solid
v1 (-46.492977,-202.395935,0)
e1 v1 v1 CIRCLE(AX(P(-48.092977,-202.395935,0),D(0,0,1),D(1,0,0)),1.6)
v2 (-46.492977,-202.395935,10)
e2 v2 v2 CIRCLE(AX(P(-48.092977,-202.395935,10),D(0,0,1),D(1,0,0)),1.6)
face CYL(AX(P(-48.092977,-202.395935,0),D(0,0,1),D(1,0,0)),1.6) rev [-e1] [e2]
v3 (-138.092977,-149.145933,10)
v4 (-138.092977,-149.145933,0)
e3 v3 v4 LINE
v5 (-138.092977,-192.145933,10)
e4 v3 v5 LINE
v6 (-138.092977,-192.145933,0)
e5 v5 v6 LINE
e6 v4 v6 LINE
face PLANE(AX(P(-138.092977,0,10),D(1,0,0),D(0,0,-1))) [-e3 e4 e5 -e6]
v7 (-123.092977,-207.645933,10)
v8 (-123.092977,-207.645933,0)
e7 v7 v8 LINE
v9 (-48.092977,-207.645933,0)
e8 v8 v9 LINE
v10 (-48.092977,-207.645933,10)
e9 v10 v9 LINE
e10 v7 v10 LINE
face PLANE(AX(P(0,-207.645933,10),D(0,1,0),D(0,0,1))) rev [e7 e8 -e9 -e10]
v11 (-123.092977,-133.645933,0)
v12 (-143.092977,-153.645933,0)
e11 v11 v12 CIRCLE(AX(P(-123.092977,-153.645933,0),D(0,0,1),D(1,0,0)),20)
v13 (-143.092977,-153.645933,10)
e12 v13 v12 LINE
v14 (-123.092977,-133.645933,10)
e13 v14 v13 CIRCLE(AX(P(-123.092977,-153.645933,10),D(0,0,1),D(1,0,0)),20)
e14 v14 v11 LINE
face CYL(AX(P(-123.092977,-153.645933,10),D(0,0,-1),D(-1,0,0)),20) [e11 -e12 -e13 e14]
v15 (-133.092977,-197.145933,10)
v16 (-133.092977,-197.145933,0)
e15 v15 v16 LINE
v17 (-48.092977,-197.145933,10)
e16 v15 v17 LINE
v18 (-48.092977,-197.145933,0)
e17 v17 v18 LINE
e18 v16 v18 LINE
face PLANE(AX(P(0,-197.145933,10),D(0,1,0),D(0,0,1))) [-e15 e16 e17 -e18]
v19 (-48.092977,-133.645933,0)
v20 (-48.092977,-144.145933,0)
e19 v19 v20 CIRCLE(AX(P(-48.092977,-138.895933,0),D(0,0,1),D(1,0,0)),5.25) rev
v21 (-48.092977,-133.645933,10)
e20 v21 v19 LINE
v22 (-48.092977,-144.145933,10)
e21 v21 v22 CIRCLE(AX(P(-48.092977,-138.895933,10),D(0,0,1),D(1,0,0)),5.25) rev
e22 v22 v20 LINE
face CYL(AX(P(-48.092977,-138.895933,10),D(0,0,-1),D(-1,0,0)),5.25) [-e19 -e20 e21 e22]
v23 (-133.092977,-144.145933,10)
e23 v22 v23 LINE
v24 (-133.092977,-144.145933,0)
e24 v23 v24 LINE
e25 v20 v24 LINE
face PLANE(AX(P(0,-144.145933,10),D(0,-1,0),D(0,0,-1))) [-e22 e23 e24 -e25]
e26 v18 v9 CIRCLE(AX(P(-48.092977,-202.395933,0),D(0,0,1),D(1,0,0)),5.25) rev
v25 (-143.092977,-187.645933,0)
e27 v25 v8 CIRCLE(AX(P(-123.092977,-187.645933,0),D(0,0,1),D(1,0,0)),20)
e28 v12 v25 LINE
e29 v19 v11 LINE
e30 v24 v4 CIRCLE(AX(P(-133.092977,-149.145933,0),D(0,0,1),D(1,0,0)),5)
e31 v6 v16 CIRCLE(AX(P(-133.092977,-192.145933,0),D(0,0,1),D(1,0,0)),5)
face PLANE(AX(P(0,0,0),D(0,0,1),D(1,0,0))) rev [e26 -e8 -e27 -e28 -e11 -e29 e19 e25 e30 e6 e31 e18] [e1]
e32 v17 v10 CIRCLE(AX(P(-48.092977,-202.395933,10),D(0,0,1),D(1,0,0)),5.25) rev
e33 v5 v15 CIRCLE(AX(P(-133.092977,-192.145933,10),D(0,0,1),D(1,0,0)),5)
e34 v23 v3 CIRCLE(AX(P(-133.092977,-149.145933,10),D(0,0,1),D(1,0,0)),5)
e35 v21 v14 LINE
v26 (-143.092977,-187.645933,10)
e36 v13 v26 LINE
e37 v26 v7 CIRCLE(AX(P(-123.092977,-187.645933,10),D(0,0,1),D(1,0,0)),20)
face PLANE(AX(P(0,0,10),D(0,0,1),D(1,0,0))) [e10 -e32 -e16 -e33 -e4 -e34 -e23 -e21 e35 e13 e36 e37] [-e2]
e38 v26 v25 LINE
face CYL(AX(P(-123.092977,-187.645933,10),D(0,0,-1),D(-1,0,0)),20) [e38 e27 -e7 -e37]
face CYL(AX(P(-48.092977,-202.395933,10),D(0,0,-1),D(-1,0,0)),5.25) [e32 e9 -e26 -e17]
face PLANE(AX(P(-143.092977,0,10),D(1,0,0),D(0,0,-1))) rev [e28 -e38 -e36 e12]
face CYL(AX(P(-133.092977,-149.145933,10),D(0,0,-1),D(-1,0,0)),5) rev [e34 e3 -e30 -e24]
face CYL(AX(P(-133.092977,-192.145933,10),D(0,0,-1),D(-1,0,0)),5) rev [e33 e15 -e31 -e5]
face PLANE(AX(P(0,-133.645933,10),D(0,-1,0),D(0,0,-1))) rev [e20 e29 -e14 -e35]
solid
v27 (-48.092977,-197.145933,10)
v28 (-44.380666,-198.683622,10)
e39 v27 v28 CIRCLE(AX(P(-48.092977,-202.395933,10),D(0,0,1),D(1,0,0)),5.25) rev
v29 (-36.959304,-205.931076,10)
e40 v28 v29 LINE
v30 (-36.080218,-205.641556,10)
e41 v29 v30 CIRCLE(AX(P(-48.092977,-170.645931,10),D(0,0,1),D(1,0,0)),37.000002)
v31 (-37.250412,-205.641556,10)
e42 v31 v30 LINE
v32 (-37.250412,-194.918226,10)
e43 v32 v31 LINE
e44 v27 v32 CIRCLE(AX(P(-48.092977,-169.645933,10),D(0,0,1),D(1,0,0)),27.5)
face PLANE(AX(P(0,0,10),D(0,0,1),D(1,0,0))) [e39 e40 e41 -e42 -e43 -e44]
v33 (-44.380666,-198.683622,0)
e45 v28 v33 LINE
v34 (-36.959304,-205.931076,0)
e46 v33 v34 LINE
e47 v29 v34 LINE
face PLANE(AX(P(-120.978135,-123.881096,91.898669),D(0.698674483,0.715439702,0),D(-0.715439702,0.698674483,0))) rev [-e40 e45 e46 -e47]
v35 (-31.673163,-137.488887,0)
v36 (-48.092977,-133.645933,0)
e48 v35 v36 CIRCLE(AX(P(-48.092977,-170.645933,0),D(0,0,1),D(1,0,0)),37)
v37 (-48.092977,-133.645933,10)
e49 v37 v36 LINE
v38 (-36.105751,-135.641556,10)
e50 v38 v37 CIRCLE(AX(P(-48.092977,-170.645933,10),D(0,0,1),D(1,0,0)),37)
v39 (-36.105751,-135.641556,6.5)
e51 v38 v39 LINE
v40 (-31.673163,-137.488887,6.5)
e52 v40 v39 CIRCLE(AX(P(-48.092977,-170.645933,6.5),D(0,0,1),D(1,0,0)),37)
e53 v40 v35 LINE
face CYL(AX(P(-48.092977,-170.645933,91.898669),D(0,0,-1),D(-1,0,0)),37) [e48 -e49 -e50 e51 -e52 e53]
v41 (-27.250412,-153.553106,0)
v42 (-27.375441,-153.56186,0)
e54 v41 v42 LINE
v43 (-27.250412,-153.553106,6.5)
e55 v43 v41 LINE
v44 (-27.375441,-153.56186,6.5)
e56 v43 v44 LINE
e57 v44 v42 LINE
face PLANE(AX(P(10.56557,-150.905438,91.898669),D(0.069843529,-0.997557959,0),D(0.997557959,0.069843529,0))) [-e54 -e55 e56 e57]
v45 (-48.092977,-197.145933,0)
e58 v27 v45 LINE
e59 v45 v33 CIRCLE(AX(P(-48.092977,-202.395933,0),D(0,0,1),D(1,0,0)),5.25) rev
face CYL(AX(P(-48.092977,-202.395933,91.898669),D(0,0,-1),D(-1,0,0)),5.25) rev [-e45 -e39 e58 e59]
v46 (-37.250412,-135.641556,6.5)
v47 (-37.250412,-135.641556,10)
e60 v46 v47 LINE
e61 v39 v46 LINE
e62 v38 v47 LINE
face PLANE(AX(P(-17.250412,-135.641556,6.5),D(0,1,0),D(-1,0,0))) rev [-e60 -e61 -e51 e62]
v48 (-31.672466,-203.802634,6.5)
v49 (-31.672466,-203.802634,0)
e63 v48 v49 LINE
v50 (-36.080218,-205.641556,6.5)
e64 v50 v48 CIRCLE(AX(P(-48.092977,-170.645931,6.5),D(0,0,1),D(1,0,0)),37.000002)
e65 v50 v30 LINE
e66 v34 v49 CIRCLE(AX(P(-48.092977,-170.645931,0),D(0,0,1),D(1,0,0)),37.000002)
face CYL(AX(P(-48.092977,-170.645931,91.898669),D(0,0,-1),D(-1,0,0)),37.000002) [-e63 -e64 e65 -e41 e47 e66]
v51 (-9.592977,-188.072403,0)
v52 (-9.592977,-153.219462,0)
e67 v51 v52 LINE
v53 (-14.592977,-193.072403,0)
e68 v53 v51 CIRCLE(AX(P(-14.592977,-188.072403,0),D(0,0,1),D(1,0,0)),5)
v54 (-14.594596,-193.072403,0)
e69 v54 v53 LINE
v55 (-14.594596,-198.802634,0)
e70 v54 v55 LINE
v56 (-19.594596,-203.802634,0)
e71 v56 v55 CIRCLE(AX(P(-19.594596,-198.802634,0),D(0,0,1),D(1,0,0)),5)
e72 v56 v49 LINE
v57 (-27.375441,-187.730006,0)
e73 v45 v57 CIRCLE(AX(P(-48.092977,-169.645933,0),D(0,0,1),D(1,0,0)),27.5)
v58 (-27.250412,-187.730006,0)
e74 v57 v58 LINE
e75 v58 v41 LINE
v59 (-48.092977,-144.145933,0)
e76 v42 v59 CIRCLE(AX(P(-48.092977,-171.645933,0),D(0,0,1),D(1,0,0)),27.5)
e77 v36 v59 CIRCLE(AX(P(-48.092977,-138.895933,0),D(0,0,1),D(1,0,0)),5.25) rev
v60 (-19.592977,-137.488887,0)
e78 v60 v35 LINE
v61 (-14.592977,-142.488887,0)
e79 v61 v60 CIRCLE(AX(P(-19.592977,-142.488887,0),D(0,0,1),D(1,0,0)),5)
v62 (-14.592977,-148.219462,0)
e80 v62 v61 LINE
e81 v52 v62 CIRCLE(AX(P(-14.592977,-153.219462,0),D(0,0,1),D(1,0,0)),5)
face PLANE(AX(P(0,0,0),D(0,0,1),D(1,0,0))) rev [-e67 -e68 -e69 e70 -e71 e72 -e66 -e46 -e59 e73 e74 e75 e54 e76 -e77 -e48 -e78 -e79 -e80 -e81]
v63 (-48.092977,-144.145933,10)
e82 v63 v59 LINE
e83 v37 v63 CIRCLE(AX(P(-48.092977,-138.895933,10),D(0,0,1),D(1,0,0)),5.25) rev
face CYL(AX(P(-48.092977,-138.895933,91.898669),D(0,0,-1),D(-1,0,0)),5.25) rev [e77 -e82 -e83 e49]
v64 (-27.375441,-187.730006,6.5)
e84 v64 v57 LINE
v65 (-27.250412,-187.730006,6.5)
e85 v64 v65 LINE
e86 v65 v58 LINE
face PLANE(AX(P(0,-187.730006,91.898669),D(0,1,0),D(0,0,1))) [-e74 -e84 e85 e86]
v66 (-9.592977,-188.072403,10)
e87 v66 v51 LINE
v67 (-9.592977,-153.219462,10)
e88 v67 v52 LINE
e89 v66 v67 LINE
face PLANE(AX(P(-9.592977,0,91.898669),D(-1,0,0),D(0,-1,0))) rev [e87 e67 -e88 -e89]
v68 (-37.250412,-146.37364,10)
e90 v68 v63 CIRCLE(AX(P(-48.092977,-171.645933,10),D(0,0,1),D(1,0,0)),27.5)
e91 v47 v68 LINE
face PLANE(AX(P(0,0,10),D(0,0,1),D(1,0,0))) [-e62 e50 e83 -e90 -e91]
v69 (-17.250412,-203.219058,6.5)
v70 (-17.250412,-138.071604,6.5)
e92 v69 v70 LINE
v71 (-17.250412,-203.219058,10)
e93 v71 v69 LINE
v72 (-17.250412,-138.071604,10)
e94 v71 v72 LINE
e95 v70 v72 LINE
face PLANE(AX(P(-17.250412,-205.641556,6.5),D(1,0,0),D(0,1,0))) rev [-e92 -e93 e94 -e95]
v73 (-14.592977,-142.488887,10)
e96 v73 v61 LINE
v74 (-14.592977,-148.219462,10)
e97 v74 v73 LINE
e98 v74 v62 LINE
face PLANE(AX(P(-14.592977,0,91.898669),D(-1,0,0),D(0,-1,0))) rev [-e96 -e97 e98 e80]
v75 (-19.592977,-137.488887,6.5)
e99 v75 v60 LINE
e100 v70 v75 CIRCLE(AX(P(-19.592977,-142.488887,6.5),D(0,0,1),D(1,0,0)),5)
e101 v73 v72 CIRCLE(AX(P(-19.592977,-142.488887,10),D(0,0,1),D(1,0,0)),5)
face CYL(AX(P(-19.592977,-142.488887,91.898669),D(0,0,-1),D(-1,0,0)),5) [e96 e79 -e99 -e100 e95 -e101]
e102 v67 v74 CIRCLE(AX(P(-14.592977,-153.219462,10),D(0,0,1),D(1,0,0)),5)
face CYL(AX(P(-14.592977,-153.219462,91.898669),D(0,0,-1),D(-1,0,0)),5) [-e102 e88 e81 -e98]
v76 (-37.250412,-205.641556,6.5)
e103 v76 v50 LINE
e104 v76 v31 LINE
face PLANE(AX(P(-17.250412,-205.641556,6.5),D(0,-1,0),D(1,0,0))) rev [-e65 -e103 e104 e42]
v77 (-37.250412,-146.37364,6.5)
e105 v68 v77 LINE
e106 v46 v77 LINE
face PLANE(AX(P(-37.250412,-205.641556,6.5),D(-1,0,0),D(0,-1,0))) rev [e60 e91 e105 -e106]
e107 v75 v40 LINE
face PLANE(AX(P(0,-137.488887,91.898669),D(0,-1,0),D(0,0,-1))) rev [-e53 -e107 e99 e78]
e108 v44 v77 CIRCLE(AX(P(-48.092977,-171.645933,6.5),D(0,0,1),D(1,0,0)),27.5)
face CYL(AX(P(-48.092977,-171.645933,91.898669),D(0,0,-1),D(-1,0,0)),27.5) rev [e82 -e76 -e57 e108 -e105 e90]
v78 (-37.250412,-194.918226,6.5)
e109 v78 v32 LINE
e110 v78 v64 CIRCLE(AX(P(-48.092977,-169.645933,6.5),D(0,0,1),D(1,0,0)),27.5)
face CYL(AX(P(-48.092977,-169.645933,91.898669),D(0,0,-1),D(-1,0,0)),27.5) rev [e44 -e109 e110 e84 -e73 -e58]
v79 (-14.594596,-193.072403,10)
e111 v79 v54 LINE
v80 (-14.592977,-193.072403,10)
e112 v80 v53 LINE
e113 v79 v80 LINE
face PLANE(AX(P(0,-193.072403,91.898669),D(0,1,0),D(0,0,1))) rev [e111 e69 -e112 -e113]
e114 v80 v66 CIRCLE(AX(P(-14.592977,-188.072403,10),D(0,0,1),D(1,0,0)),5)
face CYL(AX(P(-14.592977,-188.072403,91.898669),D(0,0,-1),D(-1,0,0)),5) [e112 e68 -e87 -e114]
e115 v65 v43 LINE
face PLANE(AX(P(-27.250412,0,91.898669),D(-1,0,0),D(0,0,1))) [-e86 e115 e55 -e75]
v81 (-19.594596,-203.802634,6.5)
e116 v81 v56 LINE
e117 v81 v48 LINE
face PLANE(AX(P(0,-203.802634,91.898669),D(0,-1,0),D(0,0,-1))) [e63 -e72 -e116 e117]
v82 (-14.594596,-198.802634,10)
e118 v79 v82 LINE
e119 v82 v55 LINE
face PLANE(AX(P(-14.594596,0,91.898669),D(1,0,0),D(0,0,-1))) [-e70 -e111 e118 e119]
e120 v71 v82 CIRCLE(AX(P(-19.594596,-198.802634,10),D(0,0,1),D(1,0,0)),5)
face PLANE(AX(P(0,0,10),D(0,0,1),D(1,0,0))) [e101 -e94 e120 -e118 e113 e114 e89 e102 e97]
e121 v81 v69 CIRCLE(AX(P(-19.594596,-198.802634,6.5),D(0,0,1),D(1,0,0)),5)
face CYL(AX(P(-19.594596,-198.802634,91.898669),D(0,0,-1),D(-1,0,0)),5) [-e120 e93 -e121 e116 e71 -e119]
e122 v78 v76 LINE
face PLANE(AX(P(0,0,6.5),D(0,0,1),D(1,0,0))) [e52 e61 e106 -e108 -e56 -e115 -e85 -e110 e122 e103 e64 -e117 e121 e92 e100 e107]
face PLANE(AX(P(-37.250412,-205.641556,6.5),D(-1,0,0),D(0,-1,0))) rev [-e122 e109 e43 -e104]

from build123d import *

# Parameters (mm, degrees)
BOSS_EXTRUDE1_DEPTH = 10
BOSS_EXTRUDE2_DEPTH = 10
SKETCH2_W           = 20
SKETCH2_H           = 70
CUT_EXTRUDE1_DEPTH  = 3.5
SKETCH3_R           = 1.6
CUT_EXTRUDE2_DEPTH  = 253.373599124


# Read off the part's stored shape, not the designer's step: Boss-Extrude2
with BuildPart() as part:
    # Sketch1 → Boss-Extrude1 (new body)
    with BuildSketch(Plane.XY):
        with BuildLine():
            Line((-143.092977135, -153.645932851), (-143.092977135, -187.645932851))
            ThreePointArc((-143.092977135, -187.645932851), (-137.235112759, -201.788068475), (-123.092977135, -207.645932851))
            Line((-123.092977135, -207.645932851), (-48.092977135, -207.645932851))
            ThreePointArc((-48.092977135, -207.645932851), (-42.842977135, -202.395932851), (-48.092977135, -197.145932851))
            Line((-48.092977135, -197.145932851), (-133.092977135, -197.145932851))
            ThreePointArc((-133.092977135, -197.145932851), (-136.628511041, -195.681466757), (-138.092977135, -192.145932851))
            Line((-138.092977135, -192.145932851), (-138.092977135, -149.145932851))
            ThreePointArc((-138.092977135, -149.145932851), (-136.628511041, -145.610398945), (-133.092977135, -144.145932851))
            Line((-133.092977135, -144.145932851), (-48.092977135, -144.145932851))
            ThreePointArc((-48.092977135, -144.145932851), (-42.842977135, -138.895932851), (-48.092977135, -133.645932851))
            Line((-48.092977135, -133.645932851), (-123.092977135, -133.645932851))
            ThreePointArc((-123.092977135, -133.645932851), (-137.235112759, -139.503797227), (-143.092977135, -153.645932851))
        make_face()
    extrude(amount=BOSS_EXTRUDE1_DEPTH)

    # Sketch3 → Cut-Extrude2 (cut, through all)
    with BuildSketch(Plane.XY.offset(10)):
        with Locations((-48.092977135, -202.395935058)):
            Circle(SKETCH3_R)
    extrude(amount=-CUT_EXTRUDE2_DEPTH, mode=Mode.SUBTRACT)


with BuildPart() as body_2:
    # Boss-Extrude2 outline → Boss-Extrude2 (new body)
    with BuildSketch(Plane.XY):
        with BuildLine():
            ThreePointArc((-19.594596165, -203.80263398), (-16.059062259, -202.338167886), (-14.594596165, -198.80263398))
            Line((-14.594596165, -198.80263398), (-14.594596165, -193.072403439))
            Line((-14.594596165, -193.072403439), (-14.592977135, -193.072403439))
            ThreePointArc((-14.592977135, -193.072403439), (-11.057443229, -191.607937345), (-9.592977135, -188.072403439))
            Line((-9.592977135, -188.072403439), (-9.592977135, -153.219462263))
            ThreePointArc((-9.592977135, -153.219462263), (-11.05744323, -149.683928358), (-14.592977135, -148.219462263))
            Line((-14.592977135, -148.219462263), (-14.592977135, -142.488886754))
            ThreePointArc((-14.592977135, -142.488886754), (-16.05744323, -138.953352849), (-19.592977135, -137.488886754))
            Line((-19.592977135, -137.488886754), (-31.673163065, -137.488886754))
            ThreePointArc((-31.673163065, -137.488886754), (-39.661212954, -134.619479337), (-48.092977135, -133.645932851))
            ThreePointArc((-48.092977135, -133.645932851), (-42.842977135, -138.895932851), (-48.092977135, -144.145932851))
            ThreePointArc((-48.092977135, -144.145932851), (-36.714532919, -146.610338046), (-27.375441215, -153.561859599))
            Line((-27.375441215, -153.561859599), (-27.250412325, -153.553105763))
            Line((-27.250412325, -153.553105763), (-27.250412325, -187.730006103))
            Line((-27.250412325, -187.730006103), (-27.375441215, -187.730006103))
            ThreePointArc((-27.375441215, -187.730006103), (-36.714532919, -194.681527655), (-48.092977135, -197.145932851))
            ThreePointArc((-48.092977135, -197.145932851), (-46.083888931, -197.545565381), (-44.380666253, -198.683622531))
            Line((-44.380666253, -198.683622531), (-36.959303905, -205.931076013))
            ThreePointArc((-36.959303905, -205.931076013), (-34.274842822, -204.968799513), (-31.672465962, -203.80263398))
            Line((-31.672465962, -203.80263398), (-19.594596165, -203.80263398))
        make_face()
    extrude(amount=BOSS_EXTRUDE2_DEPTH)

    # Sketch2 → Cut-Extrude1 (cut)
    with BuildSketch(Plane.XY.offset(10)):
        with Locations((-27.250412325, -170.641555933)):
            Rectangle(SKETCH2_W, SKETCH2_H)
    extrude(amount=-CUT_EXTRUDE1_DEPTH, mode=Mode.SUBTRACT)


solid = Compound([part.part, body_2.part])
